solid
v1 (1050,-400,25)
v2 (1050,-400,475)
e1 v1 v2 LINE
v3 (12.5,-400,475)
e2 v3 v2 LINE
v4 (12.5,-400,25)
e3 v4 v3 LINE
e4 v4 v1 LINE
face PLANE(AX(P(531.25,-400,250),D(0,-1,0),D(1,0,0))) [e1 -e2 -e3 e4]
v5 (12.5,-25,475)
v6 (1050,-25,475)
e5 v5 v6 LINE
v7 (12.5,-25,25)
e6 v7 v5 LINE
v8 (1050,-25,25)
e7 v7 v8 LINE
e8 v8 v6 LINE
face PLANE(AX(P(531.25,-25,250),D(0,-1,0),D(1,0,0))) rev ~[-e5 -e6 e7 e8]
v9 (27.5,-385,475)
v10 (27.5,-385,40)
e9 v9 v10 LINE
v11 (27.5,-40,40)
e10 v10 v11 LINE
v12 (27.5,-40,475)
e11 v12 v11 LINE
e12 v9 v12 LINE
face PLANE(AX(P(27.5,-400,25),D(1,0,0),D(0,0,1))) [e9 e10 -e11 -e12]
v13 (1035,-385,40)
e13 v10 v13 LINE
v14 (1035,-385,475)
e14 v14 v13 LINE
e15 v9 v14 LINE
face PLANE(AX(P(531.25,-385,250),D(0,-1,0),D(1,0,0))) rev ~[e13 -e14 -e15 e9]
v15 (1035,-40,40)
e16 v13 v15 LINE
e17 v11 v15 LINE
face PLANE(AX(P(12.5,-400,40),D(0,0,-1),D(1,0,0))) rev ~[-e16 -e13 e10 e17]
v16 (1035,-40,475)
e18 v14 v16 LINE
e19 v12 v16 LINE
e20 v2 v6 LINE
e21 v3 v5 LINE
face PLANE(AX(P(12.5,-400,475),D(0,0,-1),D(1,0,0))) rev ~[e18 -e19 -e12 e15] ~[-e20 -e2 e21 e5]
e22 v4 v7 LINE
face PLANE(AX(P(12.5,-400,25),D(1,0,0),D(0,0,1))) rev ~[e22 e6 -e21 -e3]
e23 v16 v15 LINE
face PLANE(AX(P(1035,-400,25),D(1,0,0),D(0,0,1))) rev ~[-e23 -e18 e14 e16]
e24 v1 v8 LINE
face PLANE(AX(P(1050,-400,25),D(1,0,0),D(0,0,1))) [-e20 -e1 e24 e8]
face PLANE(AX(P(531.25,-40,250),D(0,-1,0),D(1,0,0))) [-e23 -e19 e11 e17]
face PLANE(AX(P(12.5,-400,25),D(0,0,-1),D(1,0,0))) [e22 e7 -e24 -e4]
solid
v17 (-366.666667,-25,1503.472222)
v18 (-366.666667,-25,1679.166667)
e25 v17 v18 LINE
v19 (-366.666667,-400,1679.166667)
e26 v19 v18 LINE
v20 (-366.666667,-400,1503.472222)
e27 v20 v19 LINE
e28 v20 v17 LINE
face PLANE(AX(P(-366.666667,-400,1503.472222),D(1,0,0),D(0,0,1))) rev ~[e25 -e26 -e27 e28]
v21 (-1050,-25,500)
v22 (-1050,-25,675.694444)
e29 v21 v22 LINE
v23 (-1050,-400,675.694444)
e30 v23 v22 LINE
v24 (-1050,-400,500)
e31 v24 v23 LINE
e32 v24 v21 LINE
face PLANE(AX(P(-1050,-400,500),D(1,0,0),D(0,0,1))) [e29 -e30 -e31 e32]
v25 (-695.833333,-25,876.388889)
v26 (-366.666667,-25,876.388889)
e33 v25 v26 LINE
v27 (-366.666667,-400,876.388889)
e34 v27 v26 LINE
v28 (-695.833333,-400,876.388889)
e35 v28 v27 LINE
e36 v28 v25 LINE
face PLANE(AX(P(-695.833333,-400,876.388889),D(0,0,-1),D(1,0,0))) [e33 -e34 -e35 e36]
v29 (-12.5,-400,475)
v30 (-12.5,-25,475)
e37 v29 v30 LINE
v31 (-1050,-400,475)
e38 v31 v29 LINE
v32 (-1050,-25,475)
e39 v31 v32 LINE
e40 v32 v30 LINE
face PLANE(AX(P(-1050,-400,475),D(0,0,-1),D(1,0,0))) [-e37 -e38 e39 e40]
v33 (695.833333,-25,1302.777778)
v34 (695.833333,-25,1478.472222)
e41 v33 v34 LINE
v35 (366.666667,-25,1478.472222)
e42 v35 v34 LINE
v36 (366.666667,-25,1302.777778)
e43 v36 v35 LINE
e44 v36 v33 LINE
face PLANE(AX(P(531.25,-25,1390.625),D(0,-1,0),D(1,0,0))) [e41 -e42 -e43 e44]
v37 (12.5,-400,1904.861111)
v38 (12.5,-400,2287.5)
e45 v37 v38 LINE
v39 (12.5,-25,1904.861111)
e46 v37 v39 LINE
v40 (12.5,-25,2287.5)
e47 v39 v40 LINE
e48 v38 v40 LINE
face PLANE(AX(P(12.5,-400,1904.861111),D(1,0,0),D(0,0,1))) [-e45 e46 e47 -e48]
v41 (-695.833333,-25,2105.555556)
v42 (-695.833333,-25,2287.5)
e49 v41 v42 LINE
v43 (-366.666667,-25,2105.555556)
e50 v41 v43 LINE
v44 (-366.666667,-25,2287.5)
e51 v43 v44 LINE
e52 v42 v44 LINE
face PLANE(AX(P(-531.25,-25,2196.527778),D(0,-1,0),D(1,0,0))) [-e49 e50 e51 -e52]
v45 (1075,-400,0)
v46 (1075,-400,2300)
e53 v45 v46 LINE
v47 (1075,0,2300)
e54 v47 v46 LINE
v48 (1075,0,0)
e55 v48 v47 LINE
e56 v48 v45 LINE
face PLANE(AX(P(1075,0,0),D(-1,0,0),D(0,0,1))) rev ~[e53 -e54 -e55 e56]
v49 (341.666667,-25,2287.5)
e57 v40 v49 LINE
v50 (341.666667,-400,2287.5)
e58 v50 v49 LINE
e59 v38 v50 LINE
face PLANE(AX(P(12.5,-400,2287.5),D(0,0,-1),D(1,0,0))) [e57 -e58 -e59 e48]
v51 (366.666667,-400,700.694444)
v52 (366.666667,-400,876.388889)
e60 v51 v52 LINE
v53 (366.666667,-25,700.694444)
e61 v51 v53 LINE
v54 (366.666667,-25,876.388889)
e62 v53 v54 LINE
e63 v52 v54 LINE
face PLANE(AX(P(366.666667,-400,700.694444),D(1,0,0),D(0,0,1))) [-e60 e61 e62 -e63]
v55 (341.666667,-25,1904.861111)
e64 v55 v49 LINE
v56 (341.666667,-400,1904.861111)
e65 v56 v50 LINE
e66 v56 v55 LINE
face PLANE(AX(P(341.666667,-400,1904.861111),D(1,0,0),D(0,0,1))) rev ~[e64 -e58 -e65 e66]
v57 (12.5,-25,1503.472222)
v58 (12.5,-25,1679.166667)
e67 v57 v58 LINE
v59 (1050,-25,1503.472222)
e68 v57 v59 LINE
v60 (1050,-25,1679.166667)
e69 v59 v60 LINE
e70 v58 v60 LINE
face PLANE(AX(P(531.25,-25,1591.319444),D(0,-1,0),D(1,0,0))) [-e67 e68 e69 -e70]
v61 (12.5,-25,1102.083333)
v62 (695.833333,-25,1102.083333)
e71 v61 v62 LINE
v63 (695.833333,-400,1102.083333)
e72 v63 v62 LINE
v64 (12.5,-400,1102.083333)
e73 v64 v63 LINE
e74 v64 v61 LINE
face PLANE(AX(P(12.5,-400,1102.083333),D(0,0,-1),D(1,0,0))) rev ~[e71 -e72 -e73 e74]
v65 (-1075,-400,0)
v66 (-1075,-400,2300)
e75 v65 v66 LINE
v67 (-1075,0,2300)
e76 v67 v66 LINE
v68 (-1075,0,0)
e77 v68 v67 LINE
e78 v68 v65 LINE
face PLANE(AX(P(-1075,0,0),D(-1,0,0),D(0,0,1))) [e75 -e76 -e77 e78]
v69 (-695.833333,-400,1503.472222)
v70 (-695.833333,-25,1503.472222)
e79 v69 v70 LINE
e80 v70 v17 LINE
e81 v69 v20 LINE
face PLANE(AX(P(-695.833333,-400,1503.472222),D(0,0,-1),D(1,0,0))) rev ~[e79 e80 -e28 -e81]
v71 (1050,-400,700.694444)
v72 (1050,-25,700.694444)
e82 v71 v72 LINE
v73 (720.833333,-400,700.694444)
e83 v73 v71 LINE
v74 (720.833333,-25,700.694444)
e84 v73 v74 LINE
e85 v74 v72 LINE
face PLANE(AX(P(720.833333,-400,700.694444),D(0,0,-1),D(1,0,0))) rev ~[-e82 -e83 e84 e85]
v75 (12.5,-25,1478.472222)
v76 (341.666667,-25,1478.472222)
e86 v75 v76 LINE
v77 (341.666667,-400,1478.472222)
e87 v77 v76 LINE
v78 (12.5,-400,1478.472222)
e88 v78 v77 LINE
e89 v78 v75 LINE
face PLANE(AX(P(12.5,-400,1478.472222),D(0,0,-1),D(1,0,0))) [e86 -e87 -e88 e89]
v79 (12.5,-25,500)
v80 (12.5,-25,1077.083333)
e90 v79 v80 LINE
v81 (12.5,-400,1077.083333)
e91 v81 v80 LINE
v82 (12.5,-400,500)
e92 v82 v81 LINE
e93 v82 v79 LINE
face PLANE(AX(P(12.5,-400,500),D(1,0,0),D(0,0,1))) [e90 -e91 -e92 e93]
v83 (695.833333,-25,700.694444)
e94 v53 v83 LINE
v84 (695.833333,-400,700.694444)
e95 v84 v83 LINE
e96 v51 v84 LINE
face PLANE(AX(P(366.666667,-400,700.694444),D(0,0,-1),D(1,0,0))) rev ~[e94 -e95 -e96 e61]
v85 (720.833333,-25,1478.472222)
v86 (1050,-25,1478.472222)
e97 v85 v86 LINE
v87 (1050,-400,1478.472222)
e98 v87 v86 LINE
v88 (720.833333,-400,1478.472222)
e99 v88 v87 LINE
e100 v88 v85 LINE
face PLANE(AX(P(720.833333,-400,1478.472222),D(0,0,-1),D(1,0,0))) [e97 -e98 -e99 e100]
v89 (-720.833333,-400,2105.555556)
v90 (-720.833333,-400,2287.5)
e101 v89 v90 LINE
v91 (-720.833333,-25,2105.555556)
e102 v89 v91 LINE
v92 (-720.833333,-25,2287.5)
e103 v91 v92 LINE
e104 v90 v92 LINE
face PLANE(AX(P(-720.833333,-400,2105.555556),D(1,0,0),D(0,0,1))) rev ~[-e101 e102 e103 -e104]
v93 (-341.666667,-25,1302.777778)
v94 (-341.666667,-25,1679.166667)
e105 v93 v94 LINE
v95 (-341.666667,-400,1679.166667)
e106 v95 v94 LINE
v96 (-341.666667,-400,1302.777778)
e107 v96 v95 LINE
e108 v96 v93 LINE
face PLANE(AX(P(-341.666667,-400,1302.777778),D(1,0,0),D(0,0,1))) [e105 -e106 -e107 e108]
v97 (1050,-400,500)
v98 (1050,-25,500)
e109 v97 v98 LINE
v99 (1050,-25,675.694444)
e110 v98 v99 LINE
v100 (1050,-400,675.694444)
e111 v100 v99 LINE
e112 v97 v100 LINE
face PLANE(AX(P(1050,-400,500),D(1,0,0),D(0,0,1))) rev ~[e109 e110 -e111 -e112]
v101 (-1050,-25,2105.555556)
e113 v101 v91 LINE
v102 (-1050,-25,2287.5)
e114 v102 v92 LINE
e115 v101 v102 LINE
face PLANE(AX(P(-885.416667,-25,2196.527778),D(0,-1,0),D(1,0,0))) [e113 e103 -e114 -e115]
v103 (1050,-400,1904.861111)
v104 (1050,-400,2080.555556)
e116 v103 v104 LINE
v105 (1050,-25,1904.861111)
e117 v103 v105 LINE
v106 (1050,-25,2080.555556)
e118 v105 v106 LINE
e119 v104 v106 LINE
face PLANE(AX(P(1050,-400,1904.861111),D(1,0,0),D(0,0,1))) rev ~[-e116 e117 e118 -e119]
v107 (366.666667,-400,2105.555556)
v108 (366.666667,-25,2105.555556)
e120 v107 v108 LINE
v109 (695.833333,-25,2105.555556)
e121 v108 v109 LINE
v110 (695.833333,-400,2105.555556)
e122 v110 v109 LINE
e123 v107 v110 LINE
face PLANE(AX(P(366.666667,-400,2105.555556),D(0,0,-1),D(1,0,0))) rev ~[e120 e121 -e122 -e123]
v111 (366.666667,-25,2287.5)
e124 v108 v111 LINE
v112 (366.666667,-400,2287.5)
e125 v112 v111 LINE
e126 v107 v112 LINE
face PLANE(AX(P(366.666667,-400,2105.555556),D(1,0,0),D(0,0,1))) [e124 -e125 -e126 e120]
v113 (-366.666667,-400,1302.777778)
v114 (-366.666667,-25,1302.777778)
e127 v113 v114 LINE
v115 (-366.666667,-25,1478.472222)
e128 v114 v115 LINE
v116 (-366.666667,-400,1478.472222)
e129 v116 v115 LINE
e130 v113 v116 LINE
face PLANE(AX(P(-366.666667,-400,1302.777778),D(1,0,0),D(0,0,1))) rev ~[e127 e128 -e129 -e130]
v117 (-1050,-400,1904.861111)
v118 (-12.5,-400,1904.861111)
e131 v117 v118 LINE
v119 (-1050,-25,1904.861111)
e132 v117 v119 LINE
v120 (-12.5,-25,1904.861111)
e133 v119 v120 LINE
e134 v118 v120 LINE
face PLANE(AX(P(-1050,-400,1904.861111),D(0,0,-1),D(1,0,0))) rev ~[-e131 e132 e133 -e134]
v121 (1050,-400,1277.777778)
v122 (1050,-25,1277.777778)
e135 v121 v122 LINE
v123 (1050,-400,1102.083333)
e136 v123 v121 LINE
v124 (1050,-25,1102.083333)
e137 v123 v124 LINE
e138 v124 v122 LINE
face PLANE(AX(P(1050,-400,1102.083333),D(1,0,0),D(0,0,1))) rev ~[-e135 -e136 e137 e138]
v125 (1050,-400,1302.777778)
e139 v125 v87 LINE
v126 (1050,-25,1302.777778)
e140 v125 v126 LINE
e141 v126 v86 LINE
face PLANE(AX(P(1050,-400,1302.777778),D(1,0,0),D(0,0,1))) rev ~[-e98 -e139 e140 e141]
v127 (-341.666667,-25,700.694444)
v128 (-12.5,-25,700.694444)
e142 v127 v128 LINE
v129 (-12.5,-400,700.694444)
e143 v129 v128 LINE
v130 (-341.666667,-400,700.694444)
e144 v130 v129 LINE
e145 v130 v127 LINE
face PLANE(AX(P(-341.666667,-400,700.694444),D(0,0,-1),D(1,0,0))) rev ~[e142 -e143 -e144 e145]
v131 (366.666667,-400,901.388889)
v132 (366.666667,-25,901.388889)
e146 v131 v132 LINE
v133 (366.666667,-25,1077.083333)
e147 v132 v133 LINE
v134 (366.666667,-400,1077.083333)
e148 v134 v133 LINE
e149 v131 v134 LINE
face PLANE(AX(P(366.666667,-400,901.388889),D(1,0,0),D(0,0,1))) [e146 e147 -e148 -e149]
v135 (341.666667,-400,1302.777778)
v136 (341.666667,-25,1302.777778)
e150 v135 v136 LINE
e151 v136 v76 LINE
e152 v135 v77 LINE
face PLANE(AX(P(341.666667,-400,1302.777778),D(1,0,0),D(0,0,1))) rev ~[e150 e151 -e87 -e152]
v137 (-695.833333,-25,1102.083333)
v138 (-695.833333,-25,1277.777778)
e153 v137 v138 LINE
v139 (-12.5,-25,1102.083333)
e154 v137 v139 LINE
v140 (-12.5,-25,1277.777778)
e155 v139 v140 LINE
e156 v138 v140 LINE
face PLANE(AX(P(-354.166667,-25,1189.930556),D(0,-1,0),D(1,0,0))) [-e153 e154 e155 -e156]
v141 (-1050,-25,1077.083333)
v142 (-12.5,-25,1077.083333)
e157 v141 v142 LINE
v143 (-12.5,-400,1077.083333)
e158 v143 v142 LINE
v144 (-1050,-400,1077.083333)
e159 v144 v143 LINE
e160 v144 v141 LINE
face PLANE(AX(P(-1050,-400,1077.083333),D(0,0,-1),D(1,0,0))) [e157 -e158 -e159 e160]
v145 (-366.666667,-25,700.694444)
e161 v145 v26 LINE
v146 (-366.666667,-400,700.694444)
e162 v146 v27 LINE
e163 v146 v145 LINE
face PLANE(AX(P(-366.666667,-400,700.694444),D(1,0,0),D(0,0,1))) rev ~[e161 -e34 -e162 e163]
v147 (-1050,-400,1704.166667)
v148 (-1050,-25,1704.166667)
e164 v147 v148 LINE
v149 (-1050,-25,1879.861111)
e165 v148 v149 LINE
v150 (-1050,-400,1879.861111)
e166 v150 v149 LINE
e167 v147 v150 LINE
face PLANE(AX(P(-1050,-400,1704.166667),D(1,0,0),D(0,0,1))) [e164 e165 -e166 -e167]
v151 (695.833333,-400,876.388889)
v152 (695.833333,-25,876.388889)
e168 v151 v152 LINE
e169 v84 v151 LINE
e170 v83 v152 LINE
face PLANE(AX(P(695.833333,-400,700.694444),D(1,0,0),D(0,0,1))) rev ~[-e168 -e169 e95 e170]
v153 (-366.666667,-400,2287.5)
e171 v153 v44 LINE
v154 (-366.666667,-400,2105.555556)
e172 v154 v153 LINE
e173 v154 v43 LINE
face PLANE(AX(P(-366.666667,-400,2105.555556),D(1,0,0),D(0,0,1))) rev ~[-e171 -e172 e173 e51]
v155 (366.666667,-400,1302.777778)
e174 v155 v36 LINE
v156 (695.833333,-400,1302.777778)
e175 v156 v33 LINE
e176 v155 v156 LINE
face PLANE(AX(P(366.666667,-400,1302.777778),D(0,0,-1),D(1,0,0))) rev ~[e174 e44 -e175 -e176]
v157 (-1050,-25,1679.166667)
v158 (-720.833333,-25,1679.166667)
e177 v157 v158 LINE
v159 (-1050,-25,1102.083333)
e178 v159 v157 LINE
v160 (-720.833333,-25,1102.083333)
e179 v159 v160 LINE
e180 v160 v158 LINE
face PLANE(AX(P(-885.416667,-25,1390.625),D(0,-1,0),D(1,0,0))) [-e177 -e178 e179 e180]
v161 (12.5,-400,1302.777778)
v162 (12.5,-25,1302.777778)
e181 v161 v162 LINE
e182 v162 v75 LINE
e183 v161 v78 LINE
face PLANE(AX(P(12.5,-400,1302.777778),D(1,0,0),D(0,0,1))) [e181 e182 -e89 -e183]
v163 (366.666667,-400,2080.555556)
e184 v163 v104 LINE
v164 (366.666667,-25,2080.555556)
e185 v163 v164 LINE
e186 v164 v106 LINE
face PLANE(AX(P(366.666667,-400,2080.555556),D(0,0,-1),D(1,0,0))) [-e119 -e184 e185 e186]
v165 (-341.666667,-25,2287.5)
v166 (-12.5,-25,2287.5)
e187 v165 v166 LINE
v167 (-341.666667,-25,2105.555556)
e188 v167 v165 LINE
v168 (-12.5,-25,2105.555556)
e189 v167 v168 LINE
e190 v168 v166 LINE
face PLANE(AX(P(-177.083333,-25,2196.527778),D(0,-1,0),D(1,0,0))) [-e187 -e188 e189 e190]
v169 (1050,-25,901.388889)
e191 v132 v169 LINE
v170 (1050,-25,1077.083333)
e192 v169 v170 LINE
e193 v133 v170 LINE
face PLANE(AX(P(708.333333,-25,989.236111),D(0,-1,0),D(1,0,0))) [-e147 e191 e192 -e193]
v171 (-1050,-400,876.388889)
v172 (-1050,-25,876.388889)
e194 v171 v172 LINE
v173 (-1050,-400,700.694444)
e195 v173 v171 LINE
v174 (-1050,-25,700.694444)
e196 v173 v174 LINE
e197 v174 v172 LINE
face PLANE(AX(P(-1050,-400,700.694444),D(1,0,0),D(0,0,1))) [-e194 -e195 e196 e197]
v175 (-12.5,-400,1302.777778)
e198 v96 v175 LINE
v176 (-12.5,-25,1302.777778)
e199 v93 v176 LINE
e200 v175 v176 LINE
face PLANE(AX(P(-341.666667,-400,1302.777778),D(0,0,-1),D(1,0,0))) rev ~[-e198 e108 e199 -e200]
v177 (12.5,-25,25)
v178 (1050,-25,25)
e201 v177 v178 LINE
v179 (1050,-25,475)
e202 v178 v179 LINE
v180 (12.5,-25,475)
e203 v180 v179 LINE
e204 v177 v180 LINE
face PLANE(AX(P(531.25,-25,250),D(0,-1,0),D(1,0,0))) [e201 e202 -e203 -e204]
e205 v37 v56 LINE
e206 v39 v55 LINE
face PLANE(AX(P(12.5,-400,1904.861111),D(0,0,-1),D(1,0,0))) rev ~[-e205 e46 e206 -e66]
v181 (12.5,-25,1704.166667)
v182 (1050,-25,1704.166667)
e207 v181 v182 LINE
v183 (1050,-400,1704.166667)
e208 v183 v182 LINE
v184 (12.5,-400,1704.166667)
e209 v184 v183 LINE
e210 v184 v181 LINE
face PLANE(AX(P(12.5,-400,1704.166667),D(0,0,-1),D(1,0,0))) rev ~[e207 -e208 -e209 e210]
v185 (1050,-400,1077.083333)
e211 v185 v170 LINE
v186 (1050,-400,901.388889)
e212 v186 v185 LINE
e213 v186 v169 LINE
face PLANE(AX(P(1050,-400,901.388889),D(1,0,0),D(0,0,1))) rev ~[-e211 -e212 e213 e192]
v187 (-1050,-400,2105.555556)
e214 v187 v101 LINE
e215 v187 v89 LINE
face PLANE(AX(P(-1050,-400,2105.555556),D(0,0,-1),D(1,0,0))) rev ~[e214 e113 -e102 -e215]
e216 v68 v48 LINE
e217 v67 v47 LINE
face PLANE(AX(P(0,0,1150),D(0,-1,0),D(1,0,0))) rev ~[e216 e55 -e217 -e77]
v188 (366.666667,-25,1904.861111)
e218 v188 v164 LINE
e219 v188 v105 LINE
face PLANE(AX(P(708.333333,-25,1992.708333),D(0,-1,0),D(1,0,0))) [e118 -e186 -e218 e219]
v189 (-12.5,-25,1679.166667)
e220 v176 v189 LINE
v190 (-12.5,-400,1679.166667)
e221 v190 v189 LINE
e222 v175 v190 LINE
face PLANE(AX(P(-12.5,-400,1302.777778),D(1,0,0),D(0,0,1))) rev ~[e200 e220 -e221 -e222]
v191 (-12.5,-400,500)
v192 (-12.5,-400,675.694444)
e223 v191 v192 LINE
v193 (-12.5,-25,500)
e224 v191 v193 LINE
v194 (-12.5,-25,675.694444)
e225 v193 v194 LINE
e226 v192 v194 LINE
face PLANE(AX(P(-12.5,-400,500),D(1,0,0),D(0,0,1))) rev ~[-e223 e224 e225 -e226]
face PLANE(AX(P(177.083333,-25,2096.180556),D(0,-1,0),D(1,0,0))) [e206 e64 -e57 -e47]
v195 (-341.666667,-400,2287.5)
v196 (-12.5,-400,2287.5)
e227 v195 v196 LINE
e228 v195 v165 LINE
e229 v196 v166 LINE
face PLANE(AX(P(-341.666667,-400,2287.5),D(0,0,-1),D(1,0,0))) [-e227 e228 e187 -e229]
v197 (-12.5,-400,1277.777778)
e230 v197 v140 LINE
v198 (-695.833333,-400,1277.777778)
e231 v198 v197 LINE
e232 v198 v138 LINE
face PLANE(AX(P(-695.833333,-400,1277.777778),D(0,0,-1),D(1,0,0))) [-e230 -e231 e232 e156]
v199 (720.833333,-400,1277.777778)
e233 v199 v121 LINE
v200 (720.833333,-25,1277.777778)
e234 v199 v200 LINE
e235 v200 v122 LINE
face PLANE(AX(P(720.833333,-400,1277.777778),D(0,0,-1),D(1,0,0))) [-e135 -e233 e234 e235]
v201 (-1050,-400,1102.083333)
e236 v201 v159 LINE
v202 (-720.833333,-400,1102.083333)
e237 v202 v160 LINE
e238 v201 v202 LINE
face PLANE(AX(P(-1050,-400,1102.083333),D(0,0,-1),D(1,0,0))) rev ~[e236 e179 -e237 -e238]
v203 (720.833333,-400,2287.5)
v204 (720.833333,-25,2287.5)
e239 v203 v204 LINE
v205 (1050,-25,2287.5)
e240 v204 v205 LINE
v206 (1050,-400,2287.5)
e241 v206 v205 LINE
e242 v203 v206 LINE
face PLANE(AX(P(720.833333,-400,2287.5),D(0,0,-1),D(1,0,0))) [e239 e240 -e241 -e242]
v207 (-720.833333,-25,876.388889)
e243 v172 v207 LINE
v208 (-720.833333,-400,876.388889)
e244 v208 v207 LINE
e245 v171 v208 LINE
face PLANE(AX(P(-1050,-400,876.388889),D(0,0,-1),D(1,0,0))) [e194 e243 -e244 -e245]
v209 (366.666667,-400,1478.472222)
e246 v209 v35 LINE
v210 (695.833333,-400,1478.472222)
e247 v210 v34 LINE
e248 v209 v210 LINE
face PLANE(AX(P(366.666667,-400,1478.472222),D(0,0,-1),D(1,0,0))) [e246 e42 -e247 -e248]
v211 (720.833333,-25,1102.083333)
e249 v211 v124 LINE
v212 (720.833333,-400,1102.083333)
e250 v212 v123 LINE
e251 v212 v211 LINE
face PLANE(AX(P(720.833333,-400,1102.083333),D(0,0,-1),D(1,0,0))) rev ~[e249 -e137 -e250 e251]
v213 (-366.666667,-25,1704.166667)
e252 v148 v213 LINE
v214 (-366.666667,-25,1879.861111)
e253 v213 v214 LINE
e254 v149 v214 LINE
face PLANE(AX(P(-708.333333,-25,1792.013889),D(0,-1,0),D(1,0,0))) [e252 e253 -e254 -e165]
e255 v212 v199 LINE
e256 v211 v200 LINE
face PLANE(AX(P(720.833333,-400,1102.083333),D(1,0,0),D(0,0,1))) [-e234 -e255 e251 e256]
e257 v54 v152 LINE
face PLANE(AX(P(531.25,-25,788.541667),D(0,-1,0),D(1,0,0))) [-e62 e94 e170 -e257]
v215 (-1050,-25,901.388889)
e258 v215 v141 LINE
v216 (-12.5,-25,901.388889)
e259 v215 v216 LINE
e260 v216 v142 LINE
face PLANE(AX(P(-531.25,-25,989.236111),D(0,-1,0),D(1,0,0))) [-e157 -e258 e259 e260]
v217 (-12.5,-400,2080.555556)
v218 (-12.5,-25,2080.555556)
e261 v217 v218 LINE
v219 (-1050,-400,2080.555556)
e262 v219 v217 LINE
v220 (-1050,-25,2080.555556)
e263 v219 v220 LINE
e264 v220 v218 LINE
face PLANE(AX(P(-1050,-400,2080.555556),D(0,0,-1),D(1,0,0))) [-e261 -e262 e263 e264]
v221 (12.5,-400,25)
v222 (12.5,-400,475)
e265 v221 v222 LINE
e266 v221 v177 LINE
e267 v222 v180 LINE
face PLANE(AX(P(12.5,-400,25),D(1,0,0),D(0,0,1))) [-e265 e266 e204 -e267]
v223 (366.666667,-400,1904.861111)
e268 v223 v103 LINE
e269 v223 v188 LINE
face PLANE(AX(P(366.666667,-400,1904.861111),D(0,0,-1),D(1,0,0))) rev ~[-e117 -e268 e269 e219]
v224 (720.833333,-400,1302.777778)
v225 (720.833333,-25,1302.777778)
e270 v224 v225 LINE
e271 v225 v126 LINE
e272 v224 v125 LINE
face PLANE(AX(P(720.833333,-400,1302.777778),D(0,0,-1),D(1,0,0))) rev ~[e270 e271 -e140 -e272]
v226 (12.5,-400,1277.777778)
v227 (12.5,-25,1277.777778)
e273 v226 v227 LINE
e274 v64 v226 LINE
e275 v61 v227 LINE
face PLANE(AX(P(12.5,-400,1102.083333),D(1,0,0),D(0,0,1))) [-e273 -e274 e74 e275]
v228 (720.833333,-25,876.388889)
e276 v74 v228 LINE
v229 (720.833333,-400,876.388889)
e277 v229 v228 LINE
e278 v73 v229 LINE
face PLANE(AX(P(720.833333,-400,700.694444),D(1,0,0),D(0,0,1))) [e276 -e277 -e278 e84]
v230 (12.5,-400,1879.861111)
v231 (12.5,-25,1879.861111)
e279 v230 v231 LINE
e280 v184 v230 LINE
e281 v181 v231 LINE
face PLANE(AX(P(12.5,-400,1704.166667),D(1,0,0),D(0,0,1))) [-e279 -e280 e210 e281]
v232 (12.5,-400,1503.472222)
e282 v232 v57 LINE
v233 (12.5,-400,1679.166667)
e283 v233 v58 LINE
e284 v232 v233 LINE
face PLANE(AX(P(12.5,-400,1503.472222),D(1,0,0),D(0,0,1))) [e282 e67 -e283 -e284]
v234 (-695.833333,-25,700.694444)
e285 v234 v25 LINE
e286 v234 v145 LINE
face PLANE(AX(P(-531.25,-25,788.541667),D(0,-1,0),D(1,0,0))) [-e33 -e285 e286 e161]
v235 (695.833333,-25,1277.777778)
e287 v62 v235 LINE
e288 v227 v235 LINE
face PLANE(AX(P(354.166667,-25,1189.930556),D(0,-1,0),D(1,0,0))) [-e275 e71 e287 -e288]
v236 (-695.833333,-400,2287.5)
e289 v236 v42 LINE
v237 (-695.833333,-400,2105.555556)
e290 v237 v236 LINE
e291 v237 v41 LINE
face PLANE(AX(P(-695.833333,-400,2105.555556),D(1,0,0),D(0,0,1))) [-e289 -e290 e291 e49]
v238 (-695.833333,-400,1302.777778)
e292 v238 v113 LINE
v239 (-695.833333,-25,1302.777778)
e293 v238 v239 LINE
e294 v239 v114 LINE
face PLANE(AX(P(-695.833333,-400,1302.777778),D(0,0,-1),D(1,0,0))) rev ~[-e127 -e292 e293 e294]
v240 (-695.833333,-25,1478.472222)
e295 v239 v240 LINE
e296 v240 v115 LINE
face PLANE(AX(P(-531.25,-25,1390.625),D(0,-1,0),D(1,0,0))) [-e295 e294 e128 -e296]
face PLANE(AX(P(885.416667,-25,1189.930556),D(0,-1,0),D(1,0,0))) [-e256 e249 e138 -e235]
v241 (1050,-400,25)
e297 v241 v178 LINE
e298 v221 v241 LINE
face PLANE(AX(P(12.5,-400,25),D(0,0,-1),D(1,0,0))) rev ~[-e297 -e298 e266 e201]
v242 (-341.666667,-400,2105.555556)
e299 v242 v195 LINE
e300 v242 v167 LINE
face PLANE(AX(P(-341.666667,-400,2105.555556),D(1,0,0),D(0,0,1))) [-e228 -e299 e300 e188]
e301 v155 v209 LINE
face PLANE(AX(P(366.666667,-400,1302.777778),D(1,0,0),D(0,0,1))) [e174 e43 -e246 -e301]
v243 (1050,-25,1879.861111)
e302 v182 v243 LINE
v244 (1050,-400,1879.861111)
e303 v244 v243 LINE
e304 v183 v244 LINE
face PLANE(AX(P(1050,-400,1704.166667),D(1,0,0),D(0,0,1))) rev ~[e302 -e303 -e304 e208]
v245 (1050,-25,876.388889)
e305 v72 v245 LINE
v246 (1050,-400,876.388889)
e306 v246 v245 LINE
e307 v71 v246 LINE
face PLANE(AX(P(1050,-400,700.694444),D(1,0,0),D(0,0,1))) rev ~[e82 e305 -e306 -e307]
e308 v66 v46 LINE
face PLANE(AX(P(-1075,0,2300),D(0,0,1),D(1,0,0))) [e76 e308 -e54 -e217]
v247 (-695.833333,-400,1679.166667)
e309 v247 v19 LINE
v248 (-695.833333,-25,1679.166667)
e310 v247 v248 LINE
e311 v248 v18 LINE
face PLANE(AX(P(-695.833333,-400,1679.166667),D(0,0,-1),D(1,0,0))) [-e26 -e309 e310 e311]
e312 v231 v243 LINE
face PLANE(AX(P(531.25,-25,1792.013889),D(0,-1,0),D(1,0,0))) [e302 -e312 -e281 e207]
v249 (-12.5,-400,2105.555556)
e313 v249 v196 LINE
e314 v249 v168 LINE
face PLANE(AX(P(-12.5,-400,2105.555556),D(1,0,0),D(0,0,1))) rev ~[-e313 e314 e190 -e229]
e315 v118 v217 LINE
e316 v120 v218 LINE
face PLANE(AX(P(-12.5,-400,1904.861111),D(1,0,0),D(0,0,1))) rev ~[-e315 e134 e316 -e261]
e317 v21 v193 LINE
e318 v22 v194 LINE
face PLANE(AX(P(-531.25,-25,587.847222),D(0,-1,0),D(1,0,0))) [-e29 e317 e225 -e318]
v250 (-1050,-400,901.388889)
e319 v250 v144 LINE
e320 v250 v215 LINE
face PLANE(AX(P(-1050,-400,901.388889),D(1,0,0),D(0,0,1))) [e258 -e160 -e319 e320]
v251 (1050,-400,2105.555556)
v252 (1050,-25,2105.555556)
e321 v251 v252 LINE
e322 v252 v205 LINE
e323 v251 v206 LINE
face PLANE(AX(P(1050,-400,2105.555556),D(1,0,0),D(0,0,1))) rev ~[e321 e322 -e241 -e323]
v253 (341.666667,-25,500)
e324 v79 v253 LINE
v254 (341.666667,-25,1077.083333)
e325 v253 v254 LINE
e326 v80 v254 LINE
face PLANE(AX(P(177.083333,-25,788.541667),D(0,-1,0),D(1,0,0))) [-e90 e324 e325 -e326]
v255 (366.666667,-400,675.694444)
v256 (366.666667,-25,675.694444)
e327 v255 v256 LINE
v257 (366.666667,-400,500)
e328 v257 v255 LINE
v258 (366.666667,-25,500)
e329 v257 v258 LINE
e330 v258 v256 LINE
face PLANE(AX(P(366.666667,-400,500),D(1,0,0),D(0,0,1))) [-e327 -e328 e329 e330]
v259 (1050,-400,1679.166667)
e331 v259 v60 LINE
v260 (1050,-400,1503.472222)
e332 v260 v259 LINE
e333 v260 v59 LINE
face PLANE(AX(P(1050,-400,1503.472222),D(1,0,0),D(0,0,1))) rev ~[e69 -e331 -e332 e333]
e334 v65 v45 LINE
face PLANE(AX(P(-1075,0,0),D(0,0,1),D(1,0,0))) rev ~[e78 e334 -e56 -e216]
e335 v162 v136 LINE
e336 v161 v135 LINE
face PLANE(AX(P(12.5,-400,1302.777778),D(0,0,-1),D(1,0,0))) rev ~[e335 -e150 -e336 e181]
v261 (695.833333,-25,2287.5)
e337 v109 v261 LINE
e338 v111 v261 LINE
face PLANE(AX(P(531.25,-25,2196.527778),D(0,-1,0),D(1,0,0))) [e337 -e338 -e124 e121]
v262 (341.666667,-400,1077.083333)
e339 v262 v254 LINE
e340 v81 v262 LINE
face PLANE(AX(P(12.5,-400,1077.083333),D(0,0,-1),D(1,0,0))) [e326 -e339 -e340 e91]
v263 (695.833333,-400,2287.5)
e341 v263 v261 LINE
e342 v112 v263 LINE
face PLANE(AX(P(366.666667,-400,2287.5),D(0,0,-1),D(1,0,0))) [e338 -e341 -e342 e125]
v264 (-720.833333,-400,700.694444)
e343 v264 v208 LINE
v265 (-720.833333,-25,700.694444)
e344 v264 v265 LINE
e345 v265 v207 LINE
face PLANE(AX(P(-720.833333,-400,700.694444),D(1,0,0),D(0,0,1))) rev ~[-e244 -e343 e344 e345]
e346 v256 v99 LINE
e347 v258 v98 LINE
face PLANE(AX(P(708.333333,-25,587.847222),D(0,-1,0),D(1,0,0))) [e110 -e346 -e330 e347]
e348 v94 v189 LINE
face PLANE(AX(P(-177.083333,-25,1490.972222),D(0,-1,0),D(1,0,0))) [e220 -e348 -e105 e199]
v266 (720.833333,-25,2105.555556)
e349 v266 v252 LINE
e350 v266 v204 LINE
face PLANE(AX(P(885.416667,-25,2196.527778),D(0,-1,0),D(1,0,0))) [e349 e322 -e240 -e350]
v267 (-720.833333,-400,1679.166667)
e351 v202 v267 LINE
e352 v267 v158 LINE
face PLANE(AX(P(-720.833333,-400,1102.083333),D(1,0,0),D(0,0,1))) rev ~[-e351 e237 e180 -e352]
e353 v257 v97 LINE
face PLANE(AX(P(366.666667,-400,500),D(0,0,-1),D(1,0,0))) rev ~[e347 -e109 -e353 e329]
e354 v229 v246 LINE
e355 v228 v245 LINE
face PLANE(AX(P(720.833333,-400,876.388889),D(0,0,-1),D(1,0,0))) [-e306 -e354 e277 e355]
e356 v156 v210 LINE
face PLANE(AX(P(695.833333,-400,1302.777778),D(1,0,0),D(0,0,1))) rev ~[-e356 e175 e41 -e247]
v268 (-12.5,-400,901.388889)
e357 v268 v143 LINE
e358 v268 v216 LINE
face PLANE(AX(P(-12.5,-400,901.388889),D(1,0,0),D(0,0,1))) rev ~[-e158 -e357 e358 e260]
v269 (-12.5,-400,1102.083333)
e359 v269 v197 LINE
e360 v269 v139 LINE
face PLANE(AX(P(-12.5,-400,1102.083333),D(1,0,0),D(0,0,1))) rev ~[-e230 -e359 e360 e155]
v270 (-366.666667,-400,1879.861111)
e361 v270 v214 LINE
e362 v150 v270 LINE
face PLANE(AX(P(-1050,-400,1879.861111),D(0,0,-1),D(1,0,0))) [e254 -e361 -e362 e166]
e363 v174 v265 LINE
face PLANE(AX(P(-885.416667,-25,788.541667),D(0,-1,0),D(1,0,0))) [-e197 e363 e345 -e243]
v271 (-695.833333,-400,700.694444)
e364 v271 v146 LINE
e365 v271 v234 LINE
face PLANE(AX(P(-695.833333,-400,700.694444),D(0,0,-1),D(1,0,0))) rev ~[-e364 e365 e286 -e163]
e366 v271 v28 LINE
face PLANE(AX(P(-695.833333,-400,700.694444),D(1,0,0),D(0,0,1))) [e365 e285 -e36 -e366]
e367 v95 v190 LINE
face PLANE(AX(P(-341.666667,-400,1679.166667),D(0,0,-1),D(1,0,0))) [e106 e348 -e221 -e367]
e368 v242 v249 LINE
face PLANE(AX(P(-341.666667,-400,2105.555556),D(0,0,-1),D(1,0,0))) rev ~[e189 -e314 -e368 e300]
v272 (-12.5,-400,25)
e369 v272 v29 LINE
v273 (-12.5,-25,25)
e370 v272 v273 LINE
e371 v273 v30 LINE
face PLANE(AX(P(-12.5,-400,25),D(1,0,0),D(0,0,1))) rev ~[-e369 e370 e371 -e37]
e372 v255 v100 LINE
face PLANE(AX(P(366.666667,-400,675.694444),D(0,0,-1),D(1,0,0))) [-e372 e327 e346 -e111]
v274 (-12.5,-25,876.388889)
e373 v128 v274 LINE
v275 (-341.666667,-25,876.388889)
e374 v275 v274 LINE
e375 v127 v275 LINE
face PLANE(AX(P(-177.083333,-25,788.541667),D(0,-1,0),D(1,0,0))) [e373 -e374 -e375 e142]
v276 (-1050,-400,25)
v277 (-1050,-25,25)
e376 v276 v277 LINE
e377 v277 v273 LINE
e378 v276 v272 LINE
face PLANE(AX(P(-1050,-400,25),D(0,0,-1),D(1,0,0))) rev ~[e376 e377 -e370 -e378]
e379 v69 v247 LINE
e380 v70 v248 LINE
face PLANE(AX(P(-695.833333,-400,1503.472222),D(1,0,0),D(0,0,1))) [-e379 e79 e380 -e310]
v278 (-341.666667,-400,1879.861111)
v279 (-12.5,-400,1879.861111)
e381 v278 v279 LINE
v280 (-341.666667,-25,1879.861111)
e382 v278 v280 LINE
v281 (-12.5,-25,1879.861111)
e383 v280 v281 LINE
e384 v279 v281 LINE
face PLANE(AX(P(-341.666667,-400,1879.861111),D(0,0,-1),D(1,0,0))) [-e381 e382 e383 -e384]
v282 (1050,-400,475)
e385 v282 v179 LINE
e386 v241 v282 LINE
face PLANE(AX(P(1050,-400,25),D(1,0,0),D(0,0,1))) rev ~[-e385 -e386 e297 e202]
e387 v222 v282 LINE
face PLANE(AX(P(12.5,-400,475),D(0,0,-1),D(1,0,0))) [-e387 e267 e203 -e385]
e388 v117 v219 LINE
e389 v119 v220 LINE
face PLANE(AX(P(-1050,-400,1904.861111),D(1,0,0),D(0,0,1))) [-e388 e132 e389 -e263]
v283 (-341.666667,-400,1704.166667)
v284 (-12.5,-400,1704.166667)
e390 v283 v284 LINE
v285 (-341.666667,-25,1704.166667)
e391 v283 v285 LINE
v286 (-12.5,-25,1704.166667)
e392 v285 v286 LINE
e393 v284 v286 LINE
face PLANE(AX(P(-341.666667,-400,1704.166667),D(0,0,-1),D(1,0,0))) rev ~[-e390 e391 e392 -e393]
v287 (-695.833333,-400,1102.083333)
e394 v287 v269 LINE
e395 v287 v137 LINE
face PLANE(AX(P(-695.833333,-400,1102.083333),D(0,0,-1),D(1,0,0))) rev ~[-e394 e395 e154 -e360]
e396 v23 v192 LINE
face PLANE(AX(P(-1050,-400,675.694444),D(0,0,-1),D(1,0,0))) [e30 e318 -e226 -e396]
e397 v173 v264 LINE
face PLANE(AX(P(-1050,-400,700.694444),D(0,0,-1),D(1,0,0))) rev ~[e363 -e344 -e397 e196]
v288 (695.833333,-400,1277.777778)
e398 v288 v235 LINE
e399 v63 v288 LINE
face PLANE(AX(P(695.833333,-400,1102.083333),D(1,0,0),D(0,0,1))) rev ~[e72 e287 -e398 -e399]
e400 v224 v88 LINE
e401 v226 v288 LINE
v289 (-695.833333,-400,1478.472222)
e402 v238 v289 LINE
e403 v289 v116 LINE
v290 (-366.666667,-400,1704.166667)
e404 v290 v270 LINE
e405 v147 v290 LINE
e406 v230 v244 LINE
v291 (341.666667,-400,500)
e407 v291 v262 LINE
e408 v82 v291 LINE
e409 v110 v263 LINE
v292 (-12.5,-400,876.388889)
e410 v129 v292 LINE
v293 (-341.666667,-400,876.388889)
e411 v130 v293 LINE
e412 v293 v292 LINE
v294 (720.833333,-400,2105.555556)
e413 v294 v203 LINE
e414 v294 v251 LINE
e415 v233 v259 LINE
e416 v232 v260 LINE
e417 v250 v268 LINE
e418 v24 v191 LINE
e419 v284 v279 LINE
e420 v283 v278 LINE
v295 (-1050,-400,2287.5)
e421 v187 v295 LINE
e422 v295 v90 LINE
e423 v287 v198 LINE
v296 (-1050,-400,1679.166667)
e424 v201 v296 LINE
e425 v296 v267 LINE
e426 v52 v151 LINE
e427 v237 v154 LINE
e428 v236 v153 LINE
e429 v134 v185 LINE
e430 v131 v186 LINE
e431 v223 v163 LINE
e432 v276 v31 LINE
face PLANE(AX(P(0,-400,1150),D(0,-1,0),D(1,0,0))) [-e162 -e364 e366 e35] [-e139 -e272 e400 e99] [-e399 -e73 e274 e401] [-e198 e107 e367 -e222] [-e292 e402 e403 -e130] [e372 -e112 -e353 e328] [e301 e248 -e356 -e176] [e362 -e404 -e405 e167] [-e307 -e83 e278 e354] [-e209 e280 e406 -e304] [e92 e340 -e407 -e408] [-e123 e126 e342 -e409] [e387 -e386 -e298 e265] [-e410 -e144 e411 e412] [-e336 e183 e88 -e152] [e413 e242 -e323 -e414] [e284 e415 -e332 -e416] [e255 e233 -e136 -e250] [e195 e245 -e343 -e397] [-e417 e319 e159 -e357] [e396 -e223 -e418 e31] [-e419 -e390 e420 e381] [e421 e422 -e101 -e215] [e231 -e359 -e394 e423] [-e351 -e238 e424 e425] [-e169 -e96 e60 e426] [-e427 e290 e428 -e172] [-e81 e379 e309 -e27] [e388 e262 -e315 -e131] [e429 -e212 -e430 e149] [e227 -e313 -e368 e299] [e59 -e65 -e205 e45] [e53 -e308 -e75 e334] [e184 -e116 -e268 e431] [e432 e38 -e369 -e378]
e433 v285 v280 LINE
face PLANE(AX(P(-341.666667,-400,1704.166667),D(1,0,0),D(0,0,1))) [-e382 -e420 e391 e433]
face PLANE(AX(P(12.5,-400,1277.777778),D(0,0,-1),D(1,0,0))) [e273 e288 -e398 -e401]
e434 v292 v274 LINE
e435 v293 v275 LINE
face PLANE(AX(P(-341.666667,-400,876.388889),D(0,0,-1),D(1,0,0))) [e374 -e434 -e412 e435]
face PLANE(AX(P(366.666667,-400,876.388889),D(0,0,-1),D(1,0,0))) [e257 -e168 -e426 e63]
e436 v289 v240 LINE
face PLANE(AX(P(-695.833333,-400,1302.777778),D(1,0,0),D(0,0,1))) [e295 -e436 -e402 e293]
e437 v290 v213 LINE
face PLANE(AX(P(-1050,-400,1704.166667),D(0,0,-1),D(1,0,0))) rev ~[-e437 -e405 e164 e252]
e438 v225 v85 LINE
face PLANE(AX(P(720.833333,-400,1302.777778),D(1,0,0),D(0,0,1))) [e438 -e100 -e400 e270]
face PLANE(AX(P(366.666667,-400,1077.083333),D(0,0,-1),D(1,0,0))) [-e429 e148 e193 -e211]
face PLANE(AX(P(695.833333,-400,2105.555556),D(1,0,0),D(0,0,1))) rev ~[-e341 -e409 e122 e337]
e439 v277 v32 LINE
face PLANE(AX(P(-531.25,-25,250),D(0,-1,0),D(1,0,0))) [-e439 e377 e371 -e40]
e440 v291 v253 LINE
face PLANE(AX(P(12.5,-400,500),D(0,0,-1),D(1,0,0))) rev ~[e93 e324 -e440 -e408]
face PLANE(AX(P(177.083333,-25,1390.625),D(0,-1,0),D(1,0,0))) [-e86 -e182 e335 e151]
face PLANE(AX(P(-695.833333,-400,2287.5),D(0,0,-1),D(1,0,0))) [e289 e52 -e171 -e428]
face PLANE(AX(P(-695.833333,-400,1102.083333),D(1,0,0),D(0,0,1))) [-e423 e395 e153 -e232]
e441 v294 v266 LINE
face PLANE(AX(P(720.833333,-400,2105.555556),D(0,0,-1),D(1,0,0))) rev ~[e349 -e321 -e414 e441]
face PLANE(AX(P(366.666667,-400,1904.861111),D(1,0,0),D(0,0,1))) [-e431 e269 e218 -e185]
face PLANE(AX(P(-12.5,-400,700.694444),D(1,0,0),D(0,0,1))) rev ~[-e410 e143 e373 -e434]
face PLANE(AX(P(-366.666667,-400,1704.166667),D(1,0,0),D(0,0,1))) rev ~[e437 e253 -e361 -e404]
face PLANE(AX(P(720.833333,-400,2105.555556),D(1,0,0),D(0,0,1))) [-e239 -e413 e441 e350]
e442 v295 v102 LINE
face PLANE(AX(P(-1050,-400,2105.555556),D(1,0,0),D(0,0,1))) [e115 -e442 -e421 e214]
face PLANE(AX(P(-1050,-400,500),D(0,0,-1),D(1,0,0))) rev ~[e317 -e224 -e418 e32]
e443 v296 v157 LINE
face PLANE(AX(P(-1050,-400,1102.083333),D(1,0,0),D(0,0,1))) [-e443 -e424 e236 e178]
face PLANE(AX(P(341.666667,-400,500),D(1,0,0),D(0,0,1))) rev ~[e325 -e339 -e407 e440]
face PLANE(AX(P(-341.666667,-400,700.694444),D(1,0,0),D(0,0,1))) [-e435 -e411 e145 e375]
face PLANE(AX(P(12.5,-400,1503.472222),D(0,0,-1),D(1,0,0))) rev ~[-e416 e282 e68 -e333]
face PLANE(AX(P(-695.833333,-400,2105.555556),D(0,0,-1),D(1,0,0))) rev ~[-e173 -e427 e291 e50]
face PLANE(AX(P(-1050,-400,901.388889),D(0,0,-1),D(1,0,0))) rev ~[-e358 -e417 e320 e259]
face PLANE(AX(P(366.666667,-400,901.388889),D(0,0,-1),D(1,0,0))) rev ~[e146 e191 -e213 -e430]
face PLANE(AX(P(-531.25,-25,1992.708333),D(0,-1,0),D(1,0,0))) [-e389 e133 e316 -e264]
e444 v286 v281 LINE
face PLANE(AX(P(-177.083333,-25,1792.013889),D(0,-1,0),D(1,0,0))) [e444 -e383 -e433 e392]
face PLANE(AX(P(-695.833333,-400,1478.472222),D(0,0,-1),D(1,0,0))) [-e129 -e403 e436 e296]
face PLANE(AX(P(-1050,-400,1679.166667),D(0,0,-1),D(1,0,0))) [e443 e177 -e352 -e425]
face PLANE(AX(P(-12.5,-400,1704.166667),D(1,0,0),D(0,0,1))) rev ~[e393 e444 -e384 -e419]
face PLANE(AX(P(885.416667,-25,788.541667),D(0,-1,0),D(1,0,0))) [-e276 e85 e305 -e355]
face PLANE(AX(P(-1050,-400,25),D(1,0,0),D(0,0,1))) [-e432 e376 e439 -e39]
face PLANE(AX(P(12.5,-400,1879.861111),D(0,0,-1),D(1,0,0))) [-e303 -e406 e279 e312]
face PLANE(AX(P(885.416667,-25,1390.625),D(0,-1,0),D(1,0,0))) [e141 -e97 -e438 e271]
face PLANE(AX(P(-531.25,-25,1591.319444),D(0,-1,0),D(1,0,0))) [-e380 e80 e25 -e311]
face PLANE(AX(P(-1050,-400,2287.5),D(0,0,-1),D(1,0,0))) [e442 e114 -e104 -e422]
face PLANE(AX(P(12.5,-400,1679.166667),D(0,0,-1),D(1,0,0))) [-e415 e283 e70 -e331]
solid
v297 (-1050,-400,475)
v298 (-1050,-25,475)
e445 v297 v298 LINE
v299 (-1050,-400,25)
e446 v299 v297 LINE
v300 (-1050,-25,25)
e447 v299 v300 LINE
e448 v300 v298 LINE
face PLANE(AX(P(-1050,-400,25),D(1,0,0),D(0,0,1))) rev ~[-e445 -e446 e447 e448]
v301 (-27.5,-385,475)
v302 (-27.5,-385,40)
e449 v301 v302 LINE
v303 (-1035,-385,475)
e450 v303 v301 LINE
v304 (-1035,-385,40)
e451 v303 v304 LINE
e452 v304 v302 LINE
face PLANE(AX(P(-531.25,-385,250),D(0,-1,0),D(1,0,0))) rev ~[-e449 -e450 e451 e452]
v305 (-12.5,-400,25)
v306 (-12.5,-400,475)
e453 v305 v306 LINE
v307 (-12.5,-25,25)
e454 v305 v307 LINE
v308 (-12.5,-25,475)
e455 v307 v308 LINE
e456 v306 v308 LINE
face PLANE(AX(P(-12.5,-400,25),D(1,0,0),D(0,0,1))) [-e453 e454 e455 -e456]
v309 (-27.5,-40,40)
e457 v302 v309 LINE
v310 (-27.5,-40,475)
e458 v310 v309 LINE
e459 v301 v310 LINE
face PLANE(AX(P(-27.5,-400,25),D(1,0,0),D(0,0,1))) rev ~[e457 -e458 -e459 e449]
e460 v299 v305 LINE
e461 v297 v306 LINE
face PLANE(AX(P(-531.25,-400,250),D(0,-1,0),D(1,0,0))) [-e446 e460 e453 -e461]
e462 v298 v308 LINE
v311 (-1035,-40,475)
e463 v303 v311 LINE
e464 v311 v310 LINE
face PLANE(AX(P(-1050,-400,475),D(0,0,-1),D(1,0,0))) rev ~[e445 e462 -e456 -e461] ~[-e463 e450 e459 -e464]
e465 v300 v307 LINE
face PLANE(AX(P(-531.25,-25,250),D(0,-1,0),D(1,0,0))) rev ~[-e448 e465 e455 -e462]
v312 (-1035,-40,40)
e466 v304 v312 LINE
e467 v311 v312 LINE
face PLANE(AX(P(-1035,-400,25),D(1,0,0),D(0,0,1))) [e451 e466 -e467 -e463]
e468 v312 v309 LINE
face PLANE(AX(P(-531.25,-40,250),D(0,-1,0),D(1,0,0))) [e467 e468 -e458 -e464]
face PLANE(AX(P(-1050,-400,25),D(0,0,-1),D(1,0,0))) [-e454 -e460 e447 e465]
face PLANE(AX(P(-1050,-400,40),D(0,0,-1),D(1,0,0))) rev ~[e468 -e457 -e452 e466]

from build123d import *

# Parameters (mm, degrees)
F0_W     = 2150
F0_H     = 2300
F1_DEPTH = 400
F2_W     = 329.1666666667
F2_H     = 181.9444444444
F2_H_2   = 382.6388888889
F2_W_2   = 1037.5
F2_H_3   = 175.6944444444
F2_W_3   = 683.3333333333
F2_H_4   = 577.0833333333
F2_H_5   = 376.3888888889
F2_H_6   = 450
F3_DEPTH = 375
F4_DEPTH = 375
F5_T     = -15
F5_2_T   = -15


with BuildPart() as f1:
    # F0 (on Front) → F1 (new body)
    with BuildSketch(Plane.XZ):
        with Locations((0, 1150)):
            Rectangle(F0_W, F0_H)
    extrude(amount=F1_DEPTH)

    # F2 (on face) → F3 (cut, through all)
    with BuildSketch(Plane.XZ.offset(400)):
        with Locations((-885.4166666667, 2196.5277777778)):
            Rectangle(F2_W, F2_H)
        with Locations((-531.25, 2196.5277777778)):
            Rectangle(F2_W, F2_H)
        with Locations((-177.0833333333, 2196.5277777778)):
            Rectangle(F2_W, F2_H)
        with Locations((177.0833333333, 2096.1805555556)):
            Rectangle(F2_W, F2_H_2)
        with Locations((531.25, 2196.5277777778)):
            Rectangle(F2_W, F2_H)
        with Locations((885.4166666667, 2196.5277777778)):
            Rectangle(F2_W, F2_H)
        with Locations((-531.25, 1992.7083333333)):
            Rectangle(F2_W_2, F2_H_3)
        with Locations((708.3333333333, 1992.7083333333)):
            Rectangle(F2_W_3, F2_H_3)
        with Locations((-708.3333333333, 1792.0138888889)):
            Rectangle(F2_W_3, F2_H_3)
        with Locations((-177.0833333333, 1792.0138888889)):
            Rectangle(F2_W, F2_H_3)
        with Locations((531.25, 1792.0138888889)):
            Rectangle(F2_W_2, F2_H_3)
        with Locations((-885.4166666667, 1390.625)):
            Rectangle(F2_W, F2_H_4)
        with Locations((-531.25, 1591.3194444444)):
            Rectangle(F2_W, F2_H_3)
        with Locations((-531.25, 1390.625)):
            Rectangle(F2_W, F2_H_3)
        with Locations((-354.1666666667, 1189.9305555556)):
            Rectangle(F2_W_3, F2_H_3)
        with Locations((-177.0833333333, 1490.9722222222)):
            Rectangle(F2_W, F2_H_5)
        with Locations((531.25, 1591.3194444444)):
            Rectangle(F2_W_2, F2_H_3)
        with Locations((177.0833333333, 1390.625)):
            Rectangle(F2_W, F2_H_3)
        with Locations((531.25, 1390.625)):
            Rectangle(F2_W, F2_H_3)
        with Locations((885.4166666667, 1390.625)):
            Rectangle(F2_W, F2_H_3)
        with Locations((354.1666666667, 1189.9305555556)):
            Rectangle(F2_W_3, F2_H_3)
        with Locations((885.4166666667, 1189.9305555556)):
            Rectangle(F2_W, F2_H_3)
        with Locations((-531.25, 989.2361111111)):
            Rectangle(F2_W_2, F2_H_3)
        with Locations((-885.4166666667, 788.5416666667)):
            Rectangle(F2_W, F2_H_3)
        with Locations((-531.25, 788.5416666667)):
            Rectangle(F2_W, F2_H_3)
        with Locations((-177.0833333333, 788.5416666667)):
            Rectangle(F2_W, F2_H_3)
        with Locations((-531.25, 587.8472222222)):
            Rectangle(F2_W_2, F2_H_3)
        with Locations((177.0833333333, 788.5416666667)):
            Rectangle(F2_W, F2_H_4)
        with Locations((708.3333333333, 989.2361111111)):
            Rectangle(F2_W_3, F2_H_3)
        with Locations((531.25, 788.5416666667)):
            Rectangle(F2_W, F2_H_3)
        with Locations((885.4166666667, 788.5416666667)):
            Rectangle(F2_W, F2_H_3)
        with Locations((708.3333333333, 587.8472222222)):
            Rectangle(F2_W_3, F2_H_3)
        with Locations((-531.25, 250)):
            Rectangle(F2_W_2, F2_H_6)
        with Locations((531.25, 250)):
            Rectangle(F2_W_2, F2_H_6)
    extrude(amount=-F3_DEPTH, mode=Mode.SUBTRACT)


with BuildPart() as f4:
    # F2 (on face) → F4 (new body, through all)
    with BuildSketch(Plane.XZ.offset(400)):
        with Locations((-531.25, 250)):
            Rectangle(F2_W_2, F2_H_6)
    extrude(amount=-F4_DEPTH)

    # F5
    f5_openings = [f4.faces().sort_by_distance(p)[0] for p in [
        (-531.25, -212.5, 475),
    ]]
    offset(amount=F5_T, openings=f5_openings)


with BuildPart() as f4b:
    # F2 (on face) → F4, piece 2 (new body, through all)
    with BuildSketch(Plane.XZ.offset(400)):
        with Locations((531.25, 250)):
            Rectangle(F2_W_2, F2_H_6)
    extrude(amount=-F4_DEPTH)

    # F5#2
    f5_2_openings = [f4b.faces().sort_by_distance(p)[0] for p in [
        (531.25, -212.5, 475),
    ]]
    offset(amount=F5_2_T, openings=f5_2_openings)


solid = Compound([f1.part, f4.part, f4b.part])
